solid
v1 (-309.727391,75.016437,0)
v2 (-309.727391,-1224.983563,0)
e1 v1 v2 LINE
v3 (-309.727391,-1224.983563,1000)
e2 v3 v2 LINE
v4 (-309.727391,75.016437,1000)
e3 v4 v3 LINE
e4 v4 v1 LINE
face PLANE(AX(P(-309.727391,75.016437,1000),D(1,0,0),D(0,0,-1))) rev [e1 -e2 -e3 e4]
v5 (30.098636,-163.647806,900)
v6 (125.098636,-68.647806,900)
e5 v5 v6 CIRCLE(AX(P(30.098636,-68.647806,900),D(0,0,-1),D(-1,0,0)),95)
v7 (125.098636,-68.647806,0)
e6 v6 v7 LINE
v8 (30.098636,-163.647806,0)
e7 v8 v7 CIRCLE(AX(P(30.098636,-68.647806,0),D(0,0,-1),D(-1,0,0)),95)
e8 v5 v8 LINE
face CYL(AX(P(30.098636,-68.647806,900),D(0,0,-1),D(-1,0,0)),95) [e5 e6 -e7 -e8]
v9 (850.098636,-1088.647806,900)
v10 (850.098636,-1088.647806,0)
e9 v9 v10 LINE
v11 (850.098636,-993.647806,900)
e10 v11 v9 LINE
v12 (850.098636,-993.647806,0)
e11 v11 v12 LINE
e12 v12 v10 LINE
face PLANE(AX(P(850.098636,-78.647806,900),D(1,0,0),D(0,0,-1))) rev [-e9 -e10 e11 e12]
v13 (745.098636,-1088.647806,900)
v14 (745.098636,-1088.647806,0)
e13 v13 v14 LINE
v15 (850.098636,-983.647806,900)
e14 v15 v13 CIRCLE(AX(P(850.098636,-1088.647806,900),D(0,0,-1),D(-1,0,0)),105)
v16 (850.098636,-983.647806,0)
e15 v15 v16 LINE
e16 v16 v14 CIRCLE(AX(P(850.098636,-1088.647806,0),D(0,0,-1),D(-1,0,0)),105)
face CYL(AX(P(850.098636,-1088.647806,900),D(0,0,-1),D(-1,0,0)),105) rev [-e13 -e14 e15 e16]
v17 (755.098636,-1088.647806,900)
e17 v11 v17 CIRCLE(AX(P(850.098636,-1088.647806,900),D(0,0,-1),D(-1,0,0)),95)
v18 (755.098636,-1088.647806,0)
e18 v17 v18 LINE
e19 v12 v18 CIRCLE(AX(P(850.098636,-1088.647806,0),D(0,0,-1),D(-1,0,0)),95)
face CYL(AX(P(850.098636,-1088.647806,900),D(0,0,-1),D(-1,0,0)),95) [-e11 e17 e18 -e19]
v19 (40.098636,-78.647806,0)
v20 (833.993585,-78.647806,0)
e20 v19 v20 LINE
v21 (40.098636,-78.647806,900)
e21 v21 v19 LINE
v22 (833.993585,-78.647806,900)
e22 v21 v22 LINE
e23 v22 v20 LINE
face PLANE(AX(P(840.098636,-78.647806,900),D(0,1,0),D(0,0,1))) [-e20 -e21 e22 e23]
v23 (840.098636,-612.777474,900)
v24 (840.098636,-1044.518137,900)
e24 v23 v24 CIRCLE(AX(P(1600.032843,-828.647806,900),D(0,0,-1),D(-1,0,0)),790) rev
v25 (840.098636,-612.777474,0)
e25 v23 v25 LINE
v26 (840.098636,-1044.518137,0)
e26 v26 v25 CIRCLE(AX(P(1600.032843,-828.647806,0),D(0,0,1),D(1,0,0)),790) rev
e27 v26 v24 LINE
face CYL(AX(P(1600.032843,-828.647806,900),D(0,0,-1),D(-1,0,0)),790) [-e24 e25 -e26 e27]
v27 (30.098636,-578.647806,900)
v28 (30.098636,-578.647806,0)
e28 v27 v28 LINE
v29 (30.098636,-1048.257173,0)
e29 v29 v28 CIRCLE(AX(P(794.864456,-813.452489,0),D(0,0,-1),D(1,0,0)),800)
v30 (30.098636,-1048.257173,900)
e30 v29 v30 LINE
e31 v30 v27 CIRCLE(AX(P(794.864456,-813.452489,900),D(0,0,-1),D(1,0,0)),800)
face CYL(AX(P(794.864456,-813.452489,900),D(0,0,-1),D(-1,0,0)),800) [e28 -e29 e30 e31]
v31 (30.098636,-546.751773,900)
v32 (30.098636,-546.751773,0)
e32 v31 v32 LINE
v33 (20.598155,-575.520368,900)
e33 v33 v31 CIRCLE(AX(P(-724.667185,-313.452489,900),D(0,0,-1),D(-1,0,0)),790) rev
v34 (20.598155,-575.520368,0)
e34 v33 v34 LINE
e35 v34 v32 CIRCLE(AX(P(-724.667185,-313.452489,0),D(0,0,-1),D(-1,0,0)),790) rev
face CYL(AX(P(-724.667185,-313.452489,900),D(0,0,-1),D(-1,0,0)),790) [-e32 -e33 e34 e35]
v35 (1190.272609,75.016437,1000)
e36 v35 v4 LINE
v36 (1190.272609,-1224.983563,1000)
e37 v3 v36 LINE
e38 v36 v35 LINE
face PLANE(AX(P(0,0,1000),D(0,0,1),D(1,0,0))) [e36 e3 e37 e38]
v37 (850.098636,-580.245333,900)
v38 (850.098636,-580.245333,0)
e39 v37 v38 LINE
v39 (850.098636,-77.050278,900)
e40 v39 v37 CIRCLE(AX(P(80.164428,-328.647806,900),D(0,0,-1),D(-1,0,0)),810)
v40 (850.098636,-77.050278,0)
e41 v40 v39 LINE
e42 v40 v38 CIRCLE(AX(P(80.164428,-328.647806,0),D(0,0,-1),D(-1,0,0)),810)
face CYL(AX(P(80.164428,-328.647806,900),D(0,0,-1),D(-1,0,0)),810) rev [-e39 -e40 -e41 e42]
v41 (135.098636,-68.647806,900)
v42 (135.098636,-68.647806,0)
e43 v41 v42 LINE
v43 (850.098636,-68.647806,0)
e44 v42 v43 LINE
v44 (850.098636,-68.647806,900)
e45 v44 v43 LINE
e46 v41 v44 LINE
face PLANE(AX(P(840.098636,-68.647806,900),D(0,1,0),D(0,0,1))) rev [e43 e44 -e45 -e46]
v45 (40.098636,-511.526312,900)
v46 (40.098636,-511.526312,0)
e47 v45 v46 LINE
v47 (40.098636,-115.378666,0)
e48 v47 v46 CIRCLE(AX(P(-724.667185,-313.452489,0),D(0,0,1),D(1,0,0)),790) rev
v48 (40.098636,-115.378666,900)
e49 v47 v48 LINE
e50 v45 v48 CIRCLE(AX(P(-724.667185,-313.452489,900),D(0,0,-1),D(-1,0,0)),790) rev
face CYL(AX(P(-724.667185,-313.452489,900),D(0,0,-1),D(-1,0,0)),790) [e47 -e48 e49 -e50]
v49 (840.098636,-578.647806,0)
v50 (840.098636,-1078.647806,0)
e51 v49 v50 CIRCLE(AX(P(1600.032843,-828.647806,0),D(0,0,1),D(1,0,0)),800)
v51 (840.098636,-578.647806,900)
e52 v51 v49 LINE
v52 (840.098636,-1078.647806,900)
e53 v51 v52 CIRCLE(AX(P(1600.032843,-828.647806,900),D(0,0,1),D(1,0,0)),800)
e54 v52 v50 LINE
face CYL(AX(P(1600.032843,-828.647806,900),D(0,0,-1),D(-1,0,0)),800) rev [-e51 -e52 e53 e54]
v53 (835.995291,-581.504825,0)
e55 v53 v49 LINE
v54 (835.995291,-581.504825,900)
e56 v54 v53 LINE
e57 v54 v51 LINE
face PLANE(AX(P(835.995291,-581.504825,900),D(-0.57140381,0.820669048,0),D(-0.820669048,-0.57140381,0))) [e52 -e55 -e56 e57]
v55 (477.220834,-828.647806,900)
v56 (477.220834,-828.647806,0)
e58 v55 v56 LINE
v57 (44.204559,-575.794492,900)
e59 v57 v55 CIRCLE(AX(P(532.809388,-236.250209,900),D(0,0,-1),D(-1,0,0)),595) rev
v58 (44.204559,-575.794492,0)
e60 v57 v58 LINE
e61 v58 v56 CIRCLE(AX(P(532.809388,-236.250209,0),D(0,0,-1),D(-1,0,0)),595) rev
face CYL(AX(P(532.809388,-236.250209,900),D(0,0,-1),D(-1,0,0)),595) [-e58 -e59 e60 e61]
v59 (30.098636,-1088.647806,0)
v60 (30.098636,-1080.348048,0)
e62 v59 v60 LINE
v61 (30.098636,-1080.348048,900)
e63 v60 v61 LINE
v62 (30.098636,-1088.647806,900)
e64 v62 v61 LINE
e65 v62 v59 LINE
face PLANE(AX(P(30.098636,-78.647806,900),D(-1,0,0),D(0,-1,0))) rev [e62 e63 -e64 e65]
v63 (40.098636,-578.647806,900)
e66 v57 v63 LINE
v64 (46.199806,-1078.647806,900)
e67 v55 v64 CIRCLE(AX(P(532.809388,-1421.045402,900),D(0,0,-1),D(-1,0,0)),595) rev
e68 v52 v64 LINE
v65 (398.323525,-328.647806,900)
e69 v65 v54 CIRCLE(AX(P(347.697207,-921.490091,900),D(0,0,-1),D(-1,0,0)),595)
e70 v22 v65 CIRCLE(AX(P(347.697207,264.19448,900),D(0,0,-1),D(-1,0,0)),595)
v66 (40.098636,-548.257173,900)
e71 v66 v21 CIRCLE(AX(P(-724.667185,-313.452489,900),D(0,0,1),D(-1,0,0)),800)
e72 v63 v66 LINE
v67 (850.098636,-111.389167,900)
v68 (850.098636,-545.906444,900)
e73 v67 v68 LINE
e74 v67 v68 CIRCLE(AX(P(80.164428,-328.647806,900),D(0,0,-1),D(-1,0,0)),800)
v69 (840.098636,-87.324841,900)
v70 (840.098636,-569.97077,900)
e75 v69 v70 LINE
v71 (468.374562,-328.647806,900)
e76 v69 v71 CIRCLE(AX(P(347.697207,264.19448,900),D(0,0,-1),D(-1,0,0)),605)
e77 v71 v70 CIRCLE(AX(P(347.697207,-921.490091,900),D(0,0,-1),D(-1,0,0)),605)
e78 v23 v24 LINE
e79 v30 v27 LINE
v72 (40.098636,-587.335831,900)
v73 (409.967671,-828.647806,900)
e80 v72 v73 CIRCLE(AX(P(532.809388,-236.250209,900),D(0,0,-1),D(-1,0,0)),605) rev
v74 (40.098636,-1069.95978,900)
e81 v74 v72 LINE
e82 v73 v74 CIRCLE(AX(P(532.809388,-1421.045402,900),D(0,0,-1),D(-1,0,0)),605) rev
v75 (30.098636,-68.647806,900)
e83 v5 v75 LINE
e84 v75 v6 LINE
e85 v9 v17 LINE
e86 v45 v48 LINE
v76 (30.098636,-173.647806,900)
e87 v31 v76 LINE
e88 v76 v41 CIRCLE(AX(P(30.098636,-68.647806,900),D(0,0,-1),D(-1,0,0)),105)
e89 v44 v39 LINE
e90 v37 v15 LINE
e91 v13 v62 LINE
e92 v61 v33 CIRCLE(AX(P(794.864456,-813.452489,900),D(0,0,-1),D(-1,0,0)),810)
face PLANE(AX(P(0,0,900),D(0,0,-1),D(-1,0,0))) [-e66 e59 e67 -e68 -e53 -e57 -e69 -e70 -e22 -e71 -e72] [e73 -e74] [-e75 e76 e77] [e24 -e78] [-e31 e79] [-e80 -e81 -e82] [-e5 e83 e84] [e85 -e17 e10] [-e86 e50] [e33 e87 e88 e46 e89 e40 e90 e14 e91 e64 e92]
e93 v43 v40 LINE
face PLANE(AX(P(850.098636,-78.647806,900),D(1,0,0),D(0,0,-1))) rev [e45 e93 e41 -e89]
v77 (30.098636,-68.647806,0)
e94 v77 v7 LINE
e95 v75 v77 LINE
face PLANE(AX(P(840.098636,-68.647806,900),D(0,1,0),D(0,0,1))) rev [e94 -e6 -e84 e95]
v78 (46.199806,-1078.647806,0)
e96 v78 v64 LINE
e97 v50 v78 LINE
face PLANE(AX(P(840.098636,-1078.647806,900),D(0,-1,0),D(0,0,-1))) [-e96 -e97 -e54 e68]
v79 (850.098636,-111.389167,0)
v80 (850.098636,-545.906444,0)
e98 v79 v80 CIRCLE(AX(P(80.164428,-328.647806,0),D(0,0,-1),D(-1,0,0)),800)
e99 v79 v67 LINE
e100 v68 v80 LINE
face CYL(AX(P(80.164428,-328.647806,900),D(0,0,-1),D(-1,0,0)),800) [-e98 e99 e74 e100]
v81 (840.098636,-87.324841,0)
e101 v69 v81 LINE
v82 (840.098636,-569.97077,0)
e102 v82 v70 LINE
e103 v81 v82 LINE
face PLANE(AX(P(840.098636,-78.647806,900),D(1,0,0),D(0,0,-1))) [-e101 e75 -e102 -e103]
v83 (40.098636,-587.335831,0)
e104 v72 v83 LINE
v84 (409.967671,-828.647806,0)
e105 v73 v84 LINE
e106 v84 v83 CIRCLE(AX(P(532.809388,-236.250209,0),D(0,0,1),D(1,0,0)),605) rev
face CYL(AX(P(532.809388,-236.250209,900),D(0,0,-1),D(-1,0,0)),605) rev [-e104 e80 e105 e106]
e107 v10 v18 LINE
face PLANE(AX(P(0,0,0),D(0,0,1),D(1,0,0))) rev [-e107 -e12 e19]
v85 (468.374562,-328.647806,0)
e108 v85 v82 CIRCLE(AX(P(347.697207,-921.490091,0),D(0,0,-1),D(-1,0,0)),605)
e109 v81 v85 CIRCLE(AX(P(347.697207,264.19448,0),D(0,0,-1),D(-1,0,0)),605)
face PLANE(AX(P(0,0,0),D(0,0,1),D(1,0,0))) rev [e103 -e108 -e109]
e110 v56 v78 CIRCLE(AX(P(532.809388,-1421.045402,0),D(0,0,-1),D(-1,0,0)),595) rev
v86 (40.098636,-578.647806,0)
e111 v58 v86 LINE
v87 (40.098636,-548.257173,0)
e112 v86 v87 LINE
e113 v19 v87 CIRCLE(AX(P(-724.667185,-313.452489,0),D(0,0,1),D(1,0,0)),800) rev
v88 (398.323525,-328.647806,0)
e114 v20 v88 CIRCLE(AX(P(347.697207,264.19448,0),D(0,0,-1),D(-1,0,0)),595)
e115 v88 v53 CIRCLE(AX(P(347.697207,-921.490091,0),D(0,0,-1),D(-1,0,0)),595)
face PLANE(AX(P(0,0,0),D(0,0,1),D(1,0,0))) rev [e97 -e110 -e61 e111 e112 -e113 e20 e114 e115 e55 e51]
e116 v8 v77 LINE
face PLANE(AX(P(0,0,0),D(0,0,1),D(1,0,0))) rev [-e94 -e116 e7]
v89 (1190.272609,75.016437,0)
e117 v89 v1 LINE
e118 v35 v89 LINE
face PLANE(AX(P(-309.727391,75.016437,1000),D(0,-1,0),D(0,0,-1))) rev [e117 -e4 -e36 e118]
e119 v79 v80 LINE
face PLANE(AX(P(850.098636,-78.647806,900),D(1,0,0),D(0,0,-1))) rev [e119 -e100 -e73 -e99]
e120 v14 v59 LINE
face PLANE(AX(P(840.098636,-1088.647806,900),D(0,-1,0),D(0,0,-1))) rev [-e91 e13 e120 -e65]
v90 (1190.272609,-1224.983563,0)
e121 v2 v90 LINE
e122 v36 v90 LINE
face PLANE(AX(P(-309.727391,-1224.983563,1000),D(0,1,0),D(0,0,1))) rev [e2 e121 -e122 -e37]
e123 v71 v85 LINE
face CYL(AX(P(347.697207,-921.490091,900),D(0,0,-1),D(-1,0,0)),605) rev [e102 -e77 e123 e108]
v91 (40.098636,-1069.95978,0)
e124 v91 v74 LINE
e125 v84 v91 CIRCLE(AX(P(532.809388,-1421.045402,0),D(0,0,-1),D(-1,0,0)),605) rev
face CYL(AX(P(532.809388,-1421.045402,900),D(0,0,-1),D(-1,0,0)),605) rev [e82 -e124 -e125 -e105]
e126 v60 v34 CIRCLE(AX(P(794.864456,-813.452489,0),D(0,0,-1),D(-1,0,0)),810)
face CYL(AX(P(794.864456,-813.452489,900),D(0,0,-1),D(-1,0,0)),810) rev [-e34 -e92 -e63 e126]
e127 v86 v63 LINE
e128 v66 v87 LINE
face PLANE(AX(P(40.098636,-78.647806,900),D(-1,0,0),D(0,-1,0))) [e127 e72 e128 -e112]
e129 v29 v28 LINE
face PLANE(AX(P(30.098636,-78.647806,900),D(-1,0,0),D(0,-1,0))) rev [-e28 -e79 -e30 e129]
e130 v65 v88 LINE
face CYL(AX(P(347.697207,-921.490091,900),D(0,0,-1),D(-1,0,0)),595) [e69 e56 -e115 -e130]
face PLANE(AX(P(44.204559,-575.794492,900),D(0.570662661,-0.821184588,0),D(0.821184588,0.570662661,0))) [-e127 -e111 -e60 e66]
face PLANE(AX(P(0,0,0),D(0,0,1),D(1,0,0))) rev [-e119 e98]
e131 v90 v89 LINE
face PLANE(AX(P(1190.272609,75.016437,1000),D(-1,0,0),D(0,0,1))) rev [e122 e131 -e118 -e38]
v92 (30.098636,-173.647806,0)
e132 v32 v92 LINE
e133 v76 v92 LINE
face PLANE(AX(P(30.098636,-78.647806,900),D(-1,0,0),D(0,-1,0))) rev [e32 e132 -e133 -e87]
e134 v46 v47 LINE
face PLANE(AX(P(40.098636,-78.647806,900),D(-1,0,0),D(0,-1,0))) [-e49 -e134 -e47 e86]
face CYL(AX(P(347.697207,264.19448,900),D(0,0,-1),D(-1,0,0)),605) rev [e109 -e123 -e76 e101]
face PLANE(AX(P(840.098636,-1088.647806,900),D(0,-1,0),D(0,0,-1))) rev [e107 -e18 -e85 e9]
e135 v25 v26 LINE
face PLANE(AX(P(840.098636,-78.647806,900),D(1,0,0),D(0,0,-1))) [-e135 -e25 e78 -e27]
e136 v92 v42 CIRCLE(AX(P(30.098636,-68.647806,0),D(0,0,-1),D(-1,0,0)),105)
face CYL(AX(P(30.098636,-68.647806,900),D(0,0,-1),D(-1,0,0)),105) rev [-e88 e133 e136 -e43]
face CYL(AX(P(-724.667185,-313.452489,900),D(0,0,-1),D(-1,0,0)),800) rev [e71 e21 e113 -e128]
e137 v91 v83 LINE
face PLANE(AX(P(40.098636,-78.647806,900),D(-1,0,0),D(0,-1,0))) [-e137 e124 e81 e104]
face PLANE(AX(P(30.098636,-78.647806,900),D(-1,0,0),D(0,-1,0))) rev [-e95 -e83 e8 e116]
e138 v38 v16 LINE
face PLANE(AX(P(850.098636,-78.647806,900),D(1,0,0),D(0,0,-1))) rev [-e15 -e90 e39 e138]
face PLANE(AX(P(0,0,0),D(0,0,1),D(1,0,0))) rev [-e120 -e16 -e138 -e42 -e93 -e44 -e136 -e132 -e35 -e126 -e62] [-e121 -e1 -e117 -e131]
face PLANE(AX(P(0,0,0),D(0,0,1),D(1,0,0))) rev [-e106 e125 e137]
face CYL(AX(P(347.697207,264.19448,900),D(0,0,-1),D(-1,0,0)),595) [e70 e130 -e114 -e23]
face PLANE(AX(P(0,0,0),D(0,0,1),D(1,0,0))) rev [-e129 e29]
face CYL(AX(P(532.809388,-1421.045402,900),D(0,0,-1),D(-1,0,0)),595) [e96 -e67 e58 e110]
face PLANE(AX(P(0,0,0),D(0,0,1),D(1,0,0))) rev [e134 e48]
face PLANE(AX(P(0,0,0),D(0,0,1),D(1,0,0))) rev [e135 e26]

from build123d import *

# Parameters (mm, degrees)
SKETCH1_W                = 1500
SKETCH1_H                = 1300
BOSS_EXTRUDE3_DEPTH      = 1000
SKETCH5_W                = 820
SKETCH5_H                = 1020
SKETCH5_W_2              = 800
SKETCH5_H_2              = 1000
CUT_EXTRUDE_THIN5_DEPTH  = 900
CUT_EXTRUDE_THIN9_START  = -900
CUT_EXTRUDE_THIN9_DEPTH  = 900
CUT_EXTRUDE_THIN25_DEPTH = 900
CUT_EXTRUDE_THIN26_DEPTH = 900


# Read off the part's stored shape, not the designer's step: Cut-Extrude-Thin9
with BuildPart() as part:
    # Sketch1 → Boss-Extrude3 (new body)
    with BuildSketch(Plane(origin=(-226.705899875, 34.53488644, 0), x_dir=(1, 0, 0), z_dir=(0, 0, 1))):
        with Locations((666.978508717, -609.518449502)):
            Rectangle(SKETCH1_W, SKETCH1_H)
    extrude(amount=BOSS_EXTRUDE3_DEPTH)

    # Sketch5 → Cut-Extrude-Thin5 (cut)
    with BuildSketch(Plane(origin=(0, 0, 0), x_dir=(-1, 0, 0), z_dir=(0, 0, -1))):
        with Locations((-440.09863574, -578.647805533)):
            Rectangle(SKETCH5_W, SKETCH5_H)
        with Locations((-440.09863574, -578.647805533)):
            Rectangle(SKETCH5_W_2, SKETCH5_H_2, mode=Mode.SUBTRACT)
    extrude(amount=-CUT_EXTRUDE_THIN5_DEPTH, mode=Mode.SUBTRACT)

    # Cut-Extrude-Thin9 outline → Cut-Extrude-Thin9 (cut)
    with BuildSketch(Plane(origin=(0, 0, 0), x_dir=(-1, 0, 0), z_dir=(0, 0, -1)).offset(CUT_EXTRUDE_THIN9_START)):
        with BuildLine():
            ThreePointArc((-840.09863574, -612.777474084), (-810.032843418, -828.647805533), (-840.09863574, -1044.518136982))
            Line((-840.09863574, -1044.518136982), (-840.09863574, -1078.647805533))
            ThreePointArc((-840.09863574, -1078.647805533), (-800.032843418, -828.647805533), (-840.09863574, -578.647805533))
            Line((-840.09863574, -578.647805533), (-840.09863574, -612.777474084))
        make_face()
        with BuildLine():
            ThreePointArc((-40.09863574, -511.526312309), (-65.332815003, -313.452489118), (-40.09863574, -115.378665927))
            Line((-40.09863574, -115.378665927), (-40.09863574, -78.647805533))
            ThreePointArc((-40.09863574, -78.647805533), (-75.332815003, -313.452489118), (-40.09863574, -548.257172703))
            Line((-40.09863574, -548.257172703), (-40.09863574, -511.526312309))
        make_face()
        with BuildLine():
            ThreePointArc((-20.598154948, -575.520367878), (-25.486318472, -561.181617873), (-30.09863574, -546.751772975))
            Line((-30.09863574, -546.751772975), (-30.09863574, -578.647805533))
            ThreePointArc((-30.09863574, -578.647805533), (5.135543524, -813.452489118), (-30.09863574, -1048.257172703))
            Line((-30.09863574, -1048.257172703), (-30.09863574, -1080.348048155))
            ThreePointArc((-30.09863574, -1080.348048155), (14.992145049, -828.693386929), (-20.598154948, -575.520367878))
        make_face()
        with BuildLine():
            Line((-850.09863574, -111.389167393), (-850.09863574, -77.050278028))
            ThreePointArc((-850.09863574, -77.050278028), (-890.164428061, -328.647805533), (-850.09863574, -580.245333038))
            Line((-850.09863574, -580.245333038), (-850.09863574, -545.906443673))
            ThreePointArc((-850.09863574, -545.906443673), (-880.164428061, -328.647805533), (-850.09863574, -111.389167393))
        make_face()
    extrude(amount=CUT_EXTRUDE_THIN9_DEPTH, mode=Mode.SUBTRACT)

    # Sketch8 → Cut-Extrude-Thin25 (cut)
    with BuildSketch(Plane(origin=(0, 0, 0), x_dir=(-1, 0, 0), z_dir=(0, 0, -1))):
        with BuildLine():
            ThreePointArc((-44.204558678, -575.794492227), (-232.775541237, -750.064076456), (-477.220833635, -828.647805533))
            ThreePointArc((-477.220833635, -828.647805533), (-232.775541237, -907.231534609), (-44.204558678, -1081.501118839))
            Line((-44.204558678, -1081.501118839), (-35.992712801, -1075.794492227))
            ThreePointArc((-35.992712801, -1075.794492227), (-199.246048012, -916.307353384), (-409.967671451, -828.647805533))
            ThreePointArc((-409.967671451, -828.647805533), (-199.246048012, -740.988257682), (-35.992712801, -581.501118839))
            Line((-35.992712801, -581.501118839), (-44.204558678, -575.794492227))
        make_face()
        with BuildLine():
            ThreePointArc((-844.201980979, -81.504824582), (-680.110140526, -241.301950512), (-468.374562106, -328.647805533))
            ThreePointArc((-468.374562106, -328.647805533), (-680.110140526, -415.993660554), (-844.201980979, -575.790786484))
            Line((-844.201980979, -575.790786484), (-835.9952905, -581.504824582))
            ThreePointArc((-835.9952905, -581.504824582), (-645.344725951, -406.290174443), (-398.323524561, -328.647805533))
            ThreePointArc((-398.323524561, -328.647805533), (-645.344725951, -251.005436622), (-835.9952905, -75.790786484))
            Line((-835.9952905, -75.790786484), (-844.201980979, -81.504824582))
        make_face()
    extrude(amount=-CUT_EXTRUDE_THIN25_DEPTH, mode=Mode.SUBTRACT)

    # Sketch9 → Cut-Extrude-Thin26 (cut)
    with BuildSketch(Plane(origin=(0, 0, 0), x_dir=(-1, 0, 0), z_dir=(0, 0, -1))):
        with BuildLine():
            ThreePointArc((-30.09863574, -173.647805533), (44.147576285, 5.598406492), (-135.09863574, -68.647805533))
            Line((-135.09863574, -68.647805533), (-125.09863574, -68.647805533))
            ThreePointArc((-125.09863574, -68.647805533), (37.076508473, -1.47266132), (-30.09863574, -163.647805533))
            Line((-30.09863574, -163.647805533), (-30.09863574, -173.647805533))
        make_face()
        with BuildLine():
            ThreePointArc((-850.09863574, -983.647805533), (-924.344847764, -1162.894017558), (-745.09863574, -1088.647805533))
            Line((-745.09863574, -1088.647805533), (-755.09863574, -1088.647805533))
            ThreePointArc((-755.09863574, -1088.647805533), (-917.273779952, -1155.822949746), (-850.09863574, -993.647805533))
            Line((-850.09863574, -993.647805533), (-850.09863574, -983.647805533))
        make_face()
    extrude(amount=-CUT_EXTRUDE_THIN26_DEPTH, mode=Mode.SUBTRACT)


solid = part.part
